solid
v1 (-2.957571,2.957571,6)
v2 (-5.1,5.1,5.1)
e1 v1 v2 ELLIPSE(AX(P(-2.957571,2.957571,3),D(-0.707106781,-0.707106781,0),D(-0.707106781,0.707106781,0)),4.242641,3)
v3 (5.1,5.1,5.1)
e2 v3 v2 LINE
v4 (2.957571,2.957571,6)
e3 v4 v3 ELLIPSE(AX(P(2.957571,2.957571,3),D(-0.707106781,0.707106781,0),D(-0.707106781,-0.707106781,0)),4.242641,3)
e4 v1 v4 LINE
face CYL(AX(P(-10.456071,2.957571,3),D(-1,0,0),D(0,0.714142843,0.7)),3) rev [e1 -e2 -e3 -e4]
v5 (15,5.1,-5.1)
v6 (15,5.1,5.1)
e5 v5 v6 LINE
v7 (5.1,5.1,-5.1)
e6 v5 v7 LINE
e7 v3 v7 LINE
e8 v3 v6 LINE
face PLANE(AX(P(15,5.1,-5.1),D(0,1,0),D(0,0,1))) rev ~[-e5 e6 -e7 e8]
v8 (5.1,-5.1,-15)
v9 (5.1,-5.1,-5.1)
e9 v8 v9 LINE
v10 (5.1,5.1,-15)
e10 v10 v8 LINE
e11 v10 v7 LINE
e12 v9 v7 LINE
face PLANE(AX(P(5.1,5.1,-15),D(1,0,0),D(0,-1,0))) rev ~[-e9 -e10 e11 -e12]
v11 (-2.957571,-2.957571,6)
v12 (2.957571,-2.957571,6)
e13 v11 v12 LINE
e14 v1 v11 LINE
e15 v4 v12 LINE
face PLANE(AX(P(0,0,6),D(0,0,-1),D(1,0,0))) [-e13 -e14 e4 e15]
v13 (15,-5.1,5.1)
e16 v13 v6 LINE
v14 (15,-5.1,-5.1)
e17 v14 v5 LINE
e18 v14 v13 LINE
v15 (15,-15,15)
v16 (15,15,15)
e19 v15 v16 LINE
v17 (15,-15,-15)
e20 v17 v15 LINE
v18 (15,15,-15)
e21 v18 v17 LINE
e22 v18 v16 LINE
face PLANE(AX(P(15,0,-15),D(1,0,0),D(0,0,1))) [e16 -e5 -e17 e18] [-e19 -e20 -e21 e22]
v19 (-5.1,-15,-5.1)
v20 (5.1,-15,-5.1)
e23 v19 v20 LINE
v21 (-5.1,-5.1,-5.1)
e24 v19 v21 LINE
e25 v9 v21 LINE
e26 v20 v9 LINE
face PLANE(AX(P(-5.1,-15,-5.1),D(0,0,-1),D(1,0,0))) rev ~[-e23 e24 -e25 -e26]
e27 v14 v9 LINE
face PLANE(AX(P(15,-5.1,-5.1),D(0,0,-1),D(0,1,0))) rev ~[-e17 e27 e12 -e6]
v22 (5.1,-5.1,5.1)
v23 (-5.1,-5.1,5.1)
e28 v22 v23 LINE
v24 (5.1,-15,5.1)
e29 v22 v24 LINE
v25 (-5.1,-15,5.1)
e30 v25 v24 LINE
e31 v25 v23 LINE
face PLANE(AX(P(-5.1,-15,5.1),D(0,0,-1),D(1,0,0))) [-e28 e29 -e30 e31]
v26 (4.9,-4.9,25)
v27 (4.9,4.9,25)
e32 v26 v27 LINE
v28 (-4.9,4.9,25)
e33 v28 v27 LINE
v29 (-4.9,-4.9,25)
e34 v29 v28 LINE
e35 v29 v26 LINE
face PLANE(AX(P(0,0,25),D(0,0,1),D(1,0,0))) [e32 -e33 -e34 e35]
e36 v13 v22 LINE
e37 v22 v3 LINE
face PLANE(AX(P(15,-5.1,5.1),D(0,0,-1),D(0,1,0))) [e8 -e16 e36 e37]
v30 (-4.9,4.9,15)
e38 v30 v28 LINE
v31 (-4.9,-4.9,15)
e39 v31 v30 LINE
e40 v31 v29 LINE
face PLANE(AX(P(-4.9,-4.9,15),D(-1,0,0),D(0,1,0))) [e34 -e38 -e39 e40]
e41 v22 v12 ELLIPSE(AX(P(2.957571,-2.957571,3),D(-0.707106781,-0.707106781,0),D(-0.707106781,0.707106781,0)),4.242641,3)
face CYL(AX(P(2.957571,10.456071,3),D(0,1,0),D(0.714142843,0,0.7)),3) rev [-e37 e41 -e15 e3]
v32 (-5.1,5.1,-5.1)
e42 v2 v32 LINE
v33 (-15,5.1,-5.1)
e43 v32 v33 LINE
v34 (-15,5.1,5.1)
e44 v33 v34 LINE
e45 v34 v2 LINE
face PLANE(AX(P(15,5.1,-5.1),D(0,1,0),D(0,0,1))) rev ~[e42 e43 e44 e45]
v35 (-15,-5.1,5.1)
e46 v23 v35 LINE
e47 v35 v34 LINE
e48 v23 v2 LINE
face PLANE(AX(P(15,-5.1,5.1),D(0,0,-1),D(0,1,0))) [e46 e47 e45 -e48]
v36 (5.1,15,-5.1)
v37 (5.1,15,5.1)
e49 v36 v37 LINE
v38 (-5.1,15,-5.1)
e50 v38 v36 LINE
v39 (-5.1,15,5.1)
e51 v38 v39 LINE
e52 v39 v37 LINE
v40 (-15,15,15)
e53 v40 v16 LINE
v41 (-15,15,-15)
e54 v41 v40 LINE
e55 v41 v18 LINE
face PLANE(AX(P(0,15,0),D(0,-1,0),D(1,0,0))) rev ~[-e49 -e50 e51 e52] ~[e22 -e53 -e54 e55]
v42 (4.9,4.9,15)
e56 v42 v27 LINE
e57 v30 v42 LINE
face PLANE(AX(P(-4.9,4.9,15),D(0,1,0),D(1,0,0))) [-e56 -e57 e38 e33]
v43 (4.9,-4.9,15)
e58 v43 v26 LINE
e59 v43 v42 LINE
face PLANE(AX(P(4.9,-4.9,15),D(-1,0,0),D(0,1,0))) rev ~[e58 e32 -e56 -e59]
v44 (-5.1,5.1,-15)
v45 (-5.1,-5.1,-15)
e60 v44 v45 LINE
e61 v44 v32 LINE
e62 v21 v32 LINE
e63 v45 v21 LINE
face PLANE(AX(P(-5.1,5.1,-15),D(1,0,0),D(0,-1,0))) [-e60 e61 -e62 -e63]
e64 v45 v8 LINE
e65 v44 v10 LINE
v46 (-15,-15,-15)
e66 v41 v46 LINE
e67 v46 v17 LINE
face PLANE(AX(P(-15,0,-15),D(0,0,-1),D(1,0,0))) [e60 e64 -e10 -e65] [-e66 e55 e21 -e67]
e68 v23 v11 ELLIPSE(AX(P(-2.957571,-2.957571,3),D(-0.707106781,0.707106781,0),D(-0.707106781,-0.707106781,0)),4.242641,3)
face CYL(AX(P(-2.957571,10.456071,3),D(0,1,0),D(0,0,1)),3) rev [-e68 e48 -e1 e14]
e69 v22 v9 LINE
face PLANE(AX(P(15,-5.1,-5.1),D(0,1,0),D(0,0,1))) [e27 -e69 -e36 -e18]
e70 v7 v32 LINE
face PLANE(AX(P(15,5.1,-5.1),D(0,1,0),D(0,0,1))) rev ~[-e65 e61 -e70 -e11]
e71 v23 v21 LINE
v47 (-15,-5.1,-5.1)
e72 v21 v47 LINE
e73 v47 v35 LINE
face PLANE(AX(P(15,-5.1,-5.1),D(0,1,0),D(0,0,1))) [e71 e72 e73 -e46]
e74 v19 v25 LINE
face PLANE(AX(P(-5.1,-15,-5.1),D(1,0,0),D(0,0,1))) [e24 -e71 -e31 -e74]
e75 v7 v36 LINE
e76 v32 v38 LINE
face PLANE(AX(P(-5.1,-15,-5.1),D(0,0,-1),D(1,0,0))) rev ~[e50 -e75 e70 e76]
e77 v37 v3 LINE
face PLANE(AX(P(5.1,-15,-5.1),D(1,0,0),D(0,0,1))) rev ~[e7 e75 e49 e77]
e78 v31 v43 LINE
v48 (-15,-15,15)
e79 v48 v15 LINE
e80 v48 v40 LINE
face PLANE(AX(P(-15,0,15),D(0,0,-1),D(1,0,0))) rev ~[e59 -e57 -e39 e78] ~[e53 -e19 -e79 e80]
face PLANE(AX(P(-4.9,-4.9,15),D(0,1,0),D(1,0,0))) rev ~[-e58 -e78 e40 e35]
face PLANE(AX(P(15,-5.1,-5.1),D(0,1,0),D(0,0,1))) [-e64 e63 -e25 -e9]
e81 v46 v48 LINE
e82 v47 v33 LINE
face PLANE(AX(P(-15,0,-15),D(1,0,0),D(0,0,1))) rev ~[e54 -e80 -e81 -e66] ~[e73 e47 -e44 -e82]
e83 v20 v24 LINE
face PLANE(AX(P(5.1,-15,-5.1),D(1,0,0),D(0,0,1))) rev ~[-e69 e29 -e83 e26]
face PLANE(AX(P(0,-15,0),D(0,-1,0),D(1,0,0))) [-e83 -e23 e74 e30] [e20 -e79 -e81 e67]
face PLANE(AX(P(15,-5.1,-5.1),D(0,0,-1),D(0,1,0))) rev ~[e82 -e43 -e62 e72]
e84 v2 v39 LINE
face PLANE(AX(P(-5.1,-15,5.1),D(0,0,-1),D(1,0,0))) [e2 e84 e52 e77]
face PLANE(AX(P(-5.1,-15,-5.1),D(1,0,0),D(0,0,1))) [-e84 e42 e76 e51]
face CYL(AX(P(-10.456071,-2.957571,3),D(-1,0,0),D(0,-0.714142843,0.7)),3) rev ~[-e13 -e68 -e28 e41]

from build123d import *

# Parameters (mm, degrees)
F0_W         = 30
F0_H         = 30
F1_DEPTH     = 15
F2_W         = 9.8
F2_H         = 9.8
F3_DEPTH     = 10
F4_W         = 10.2
F4_H         = 10.2
F5_DEPTH     = 21
F6_W         = 10.2
F6_H         = 10.2
F7_DEPTH     = 30
F8_W         = 10.2
F8_H         = 10.2
F9_DEPTH     = 30.001
F10_T1_DEPTH = 20.9121426428
F10_T3_DEPTH = 20.9121426428


# Not quite as in the source:
# - a fillet or chamfer that OpenCascade refuses, or shapes differently, is made with other operations: its cross-section is extruded or revolved along the edge and cut away or added


with BuildPart() as f1:
    # F0 (on Front) → F1 (new body, symmetric)
    with BuildSketch(Plane.XZ):
        Rectangle(F0_W, F0_H)
    extrude(amount=F1_DEPTH, both=True)

    # F2 (on face) → F3 (join)
    with BuildSketch(Plane.XY.offset(15)):
        Rectangle(F2_W, F2_H)
    extrude(amount=F3_DEPTH)

    # F4 (on face) → F5 (cut)
    with BuildSketch(Plane(origin=(0, 0, -15), x_dir=(1, 0, 0), z_dir=(0, 0, -1))):
        Rectangle(F4_W, F4_H)
    extrude(amount=-F5_DEPTH, mode=Mode.SUBTRACT)

    # F6 (on face) → F7 (cut)
    with BuildSketch(Plane.YZ.offset(15)):
        Rectangle(F6_W, F6_H)
    extrude(amount=-F7_DEPTH, mode=Mode.SUBTRACT)

    # F8 (on face) → F9 (cut, through all)
    with BuildSketch(Plane.XZ.offset(15)):
        Rectangle(F8_W, F8_H)
    extrude(amount=-F9_DEPTH, mode=Mode.SUBTRACT)

    # F10: fillet of radius 3 on 4 edges, made by hand

    # F10_s2 → F10_t1 (join)
    with BuildSketch(Plane.YZ.offset(-10.4560713214)):
        with BuildLine():
            ThreePointArc((-5.1, 5.1), (-4.1194664753, 5.7658633372), (-2.9575714714, 6))
            Line((-2.9575714714, 6), (-5.1, 6))
            Line((-5.1, 6), (-5.1, 5.1))
        make_face()
        with BuildLine():
            ThreePointArc((5.1, 5.1), (4.1194664753, 5.7658633372), (2.9575714714, 6))
            Line((2.9575714714, 6), (5.1, 6))
            Line((5.1, 6), (5.1, 5.1))
        make_face()
    extrude(amount=F10_T1_DEPTH)

    # F10_s4 → F10_t3 (join)
    with BuildSketch(Plane.XZ.offset(-10.4560713214)):
        with BuildLine():
            ThreePointArc((5.1, 5.1), (4.1194664753, 5.7658633372), (2.9575714714, 6))
            Line((2.9575714714, 6), (5.1, 6))
            Line((5.1, 6), (5.1, 5.1))
        make_face()
        with BuildLine():
            ThreePointArc((-2.9575714714, 6), (-4.1194664753, 5.7658633372), (-5.1, 5.1))
            Line((-5.1, 5.1), (-5.1, 6))
            Line((-5.1, 6), (-2.9575714714, 6))
        make_face()
    extrude(amount=F10_T3_DEPTH)


solid = f1.part
